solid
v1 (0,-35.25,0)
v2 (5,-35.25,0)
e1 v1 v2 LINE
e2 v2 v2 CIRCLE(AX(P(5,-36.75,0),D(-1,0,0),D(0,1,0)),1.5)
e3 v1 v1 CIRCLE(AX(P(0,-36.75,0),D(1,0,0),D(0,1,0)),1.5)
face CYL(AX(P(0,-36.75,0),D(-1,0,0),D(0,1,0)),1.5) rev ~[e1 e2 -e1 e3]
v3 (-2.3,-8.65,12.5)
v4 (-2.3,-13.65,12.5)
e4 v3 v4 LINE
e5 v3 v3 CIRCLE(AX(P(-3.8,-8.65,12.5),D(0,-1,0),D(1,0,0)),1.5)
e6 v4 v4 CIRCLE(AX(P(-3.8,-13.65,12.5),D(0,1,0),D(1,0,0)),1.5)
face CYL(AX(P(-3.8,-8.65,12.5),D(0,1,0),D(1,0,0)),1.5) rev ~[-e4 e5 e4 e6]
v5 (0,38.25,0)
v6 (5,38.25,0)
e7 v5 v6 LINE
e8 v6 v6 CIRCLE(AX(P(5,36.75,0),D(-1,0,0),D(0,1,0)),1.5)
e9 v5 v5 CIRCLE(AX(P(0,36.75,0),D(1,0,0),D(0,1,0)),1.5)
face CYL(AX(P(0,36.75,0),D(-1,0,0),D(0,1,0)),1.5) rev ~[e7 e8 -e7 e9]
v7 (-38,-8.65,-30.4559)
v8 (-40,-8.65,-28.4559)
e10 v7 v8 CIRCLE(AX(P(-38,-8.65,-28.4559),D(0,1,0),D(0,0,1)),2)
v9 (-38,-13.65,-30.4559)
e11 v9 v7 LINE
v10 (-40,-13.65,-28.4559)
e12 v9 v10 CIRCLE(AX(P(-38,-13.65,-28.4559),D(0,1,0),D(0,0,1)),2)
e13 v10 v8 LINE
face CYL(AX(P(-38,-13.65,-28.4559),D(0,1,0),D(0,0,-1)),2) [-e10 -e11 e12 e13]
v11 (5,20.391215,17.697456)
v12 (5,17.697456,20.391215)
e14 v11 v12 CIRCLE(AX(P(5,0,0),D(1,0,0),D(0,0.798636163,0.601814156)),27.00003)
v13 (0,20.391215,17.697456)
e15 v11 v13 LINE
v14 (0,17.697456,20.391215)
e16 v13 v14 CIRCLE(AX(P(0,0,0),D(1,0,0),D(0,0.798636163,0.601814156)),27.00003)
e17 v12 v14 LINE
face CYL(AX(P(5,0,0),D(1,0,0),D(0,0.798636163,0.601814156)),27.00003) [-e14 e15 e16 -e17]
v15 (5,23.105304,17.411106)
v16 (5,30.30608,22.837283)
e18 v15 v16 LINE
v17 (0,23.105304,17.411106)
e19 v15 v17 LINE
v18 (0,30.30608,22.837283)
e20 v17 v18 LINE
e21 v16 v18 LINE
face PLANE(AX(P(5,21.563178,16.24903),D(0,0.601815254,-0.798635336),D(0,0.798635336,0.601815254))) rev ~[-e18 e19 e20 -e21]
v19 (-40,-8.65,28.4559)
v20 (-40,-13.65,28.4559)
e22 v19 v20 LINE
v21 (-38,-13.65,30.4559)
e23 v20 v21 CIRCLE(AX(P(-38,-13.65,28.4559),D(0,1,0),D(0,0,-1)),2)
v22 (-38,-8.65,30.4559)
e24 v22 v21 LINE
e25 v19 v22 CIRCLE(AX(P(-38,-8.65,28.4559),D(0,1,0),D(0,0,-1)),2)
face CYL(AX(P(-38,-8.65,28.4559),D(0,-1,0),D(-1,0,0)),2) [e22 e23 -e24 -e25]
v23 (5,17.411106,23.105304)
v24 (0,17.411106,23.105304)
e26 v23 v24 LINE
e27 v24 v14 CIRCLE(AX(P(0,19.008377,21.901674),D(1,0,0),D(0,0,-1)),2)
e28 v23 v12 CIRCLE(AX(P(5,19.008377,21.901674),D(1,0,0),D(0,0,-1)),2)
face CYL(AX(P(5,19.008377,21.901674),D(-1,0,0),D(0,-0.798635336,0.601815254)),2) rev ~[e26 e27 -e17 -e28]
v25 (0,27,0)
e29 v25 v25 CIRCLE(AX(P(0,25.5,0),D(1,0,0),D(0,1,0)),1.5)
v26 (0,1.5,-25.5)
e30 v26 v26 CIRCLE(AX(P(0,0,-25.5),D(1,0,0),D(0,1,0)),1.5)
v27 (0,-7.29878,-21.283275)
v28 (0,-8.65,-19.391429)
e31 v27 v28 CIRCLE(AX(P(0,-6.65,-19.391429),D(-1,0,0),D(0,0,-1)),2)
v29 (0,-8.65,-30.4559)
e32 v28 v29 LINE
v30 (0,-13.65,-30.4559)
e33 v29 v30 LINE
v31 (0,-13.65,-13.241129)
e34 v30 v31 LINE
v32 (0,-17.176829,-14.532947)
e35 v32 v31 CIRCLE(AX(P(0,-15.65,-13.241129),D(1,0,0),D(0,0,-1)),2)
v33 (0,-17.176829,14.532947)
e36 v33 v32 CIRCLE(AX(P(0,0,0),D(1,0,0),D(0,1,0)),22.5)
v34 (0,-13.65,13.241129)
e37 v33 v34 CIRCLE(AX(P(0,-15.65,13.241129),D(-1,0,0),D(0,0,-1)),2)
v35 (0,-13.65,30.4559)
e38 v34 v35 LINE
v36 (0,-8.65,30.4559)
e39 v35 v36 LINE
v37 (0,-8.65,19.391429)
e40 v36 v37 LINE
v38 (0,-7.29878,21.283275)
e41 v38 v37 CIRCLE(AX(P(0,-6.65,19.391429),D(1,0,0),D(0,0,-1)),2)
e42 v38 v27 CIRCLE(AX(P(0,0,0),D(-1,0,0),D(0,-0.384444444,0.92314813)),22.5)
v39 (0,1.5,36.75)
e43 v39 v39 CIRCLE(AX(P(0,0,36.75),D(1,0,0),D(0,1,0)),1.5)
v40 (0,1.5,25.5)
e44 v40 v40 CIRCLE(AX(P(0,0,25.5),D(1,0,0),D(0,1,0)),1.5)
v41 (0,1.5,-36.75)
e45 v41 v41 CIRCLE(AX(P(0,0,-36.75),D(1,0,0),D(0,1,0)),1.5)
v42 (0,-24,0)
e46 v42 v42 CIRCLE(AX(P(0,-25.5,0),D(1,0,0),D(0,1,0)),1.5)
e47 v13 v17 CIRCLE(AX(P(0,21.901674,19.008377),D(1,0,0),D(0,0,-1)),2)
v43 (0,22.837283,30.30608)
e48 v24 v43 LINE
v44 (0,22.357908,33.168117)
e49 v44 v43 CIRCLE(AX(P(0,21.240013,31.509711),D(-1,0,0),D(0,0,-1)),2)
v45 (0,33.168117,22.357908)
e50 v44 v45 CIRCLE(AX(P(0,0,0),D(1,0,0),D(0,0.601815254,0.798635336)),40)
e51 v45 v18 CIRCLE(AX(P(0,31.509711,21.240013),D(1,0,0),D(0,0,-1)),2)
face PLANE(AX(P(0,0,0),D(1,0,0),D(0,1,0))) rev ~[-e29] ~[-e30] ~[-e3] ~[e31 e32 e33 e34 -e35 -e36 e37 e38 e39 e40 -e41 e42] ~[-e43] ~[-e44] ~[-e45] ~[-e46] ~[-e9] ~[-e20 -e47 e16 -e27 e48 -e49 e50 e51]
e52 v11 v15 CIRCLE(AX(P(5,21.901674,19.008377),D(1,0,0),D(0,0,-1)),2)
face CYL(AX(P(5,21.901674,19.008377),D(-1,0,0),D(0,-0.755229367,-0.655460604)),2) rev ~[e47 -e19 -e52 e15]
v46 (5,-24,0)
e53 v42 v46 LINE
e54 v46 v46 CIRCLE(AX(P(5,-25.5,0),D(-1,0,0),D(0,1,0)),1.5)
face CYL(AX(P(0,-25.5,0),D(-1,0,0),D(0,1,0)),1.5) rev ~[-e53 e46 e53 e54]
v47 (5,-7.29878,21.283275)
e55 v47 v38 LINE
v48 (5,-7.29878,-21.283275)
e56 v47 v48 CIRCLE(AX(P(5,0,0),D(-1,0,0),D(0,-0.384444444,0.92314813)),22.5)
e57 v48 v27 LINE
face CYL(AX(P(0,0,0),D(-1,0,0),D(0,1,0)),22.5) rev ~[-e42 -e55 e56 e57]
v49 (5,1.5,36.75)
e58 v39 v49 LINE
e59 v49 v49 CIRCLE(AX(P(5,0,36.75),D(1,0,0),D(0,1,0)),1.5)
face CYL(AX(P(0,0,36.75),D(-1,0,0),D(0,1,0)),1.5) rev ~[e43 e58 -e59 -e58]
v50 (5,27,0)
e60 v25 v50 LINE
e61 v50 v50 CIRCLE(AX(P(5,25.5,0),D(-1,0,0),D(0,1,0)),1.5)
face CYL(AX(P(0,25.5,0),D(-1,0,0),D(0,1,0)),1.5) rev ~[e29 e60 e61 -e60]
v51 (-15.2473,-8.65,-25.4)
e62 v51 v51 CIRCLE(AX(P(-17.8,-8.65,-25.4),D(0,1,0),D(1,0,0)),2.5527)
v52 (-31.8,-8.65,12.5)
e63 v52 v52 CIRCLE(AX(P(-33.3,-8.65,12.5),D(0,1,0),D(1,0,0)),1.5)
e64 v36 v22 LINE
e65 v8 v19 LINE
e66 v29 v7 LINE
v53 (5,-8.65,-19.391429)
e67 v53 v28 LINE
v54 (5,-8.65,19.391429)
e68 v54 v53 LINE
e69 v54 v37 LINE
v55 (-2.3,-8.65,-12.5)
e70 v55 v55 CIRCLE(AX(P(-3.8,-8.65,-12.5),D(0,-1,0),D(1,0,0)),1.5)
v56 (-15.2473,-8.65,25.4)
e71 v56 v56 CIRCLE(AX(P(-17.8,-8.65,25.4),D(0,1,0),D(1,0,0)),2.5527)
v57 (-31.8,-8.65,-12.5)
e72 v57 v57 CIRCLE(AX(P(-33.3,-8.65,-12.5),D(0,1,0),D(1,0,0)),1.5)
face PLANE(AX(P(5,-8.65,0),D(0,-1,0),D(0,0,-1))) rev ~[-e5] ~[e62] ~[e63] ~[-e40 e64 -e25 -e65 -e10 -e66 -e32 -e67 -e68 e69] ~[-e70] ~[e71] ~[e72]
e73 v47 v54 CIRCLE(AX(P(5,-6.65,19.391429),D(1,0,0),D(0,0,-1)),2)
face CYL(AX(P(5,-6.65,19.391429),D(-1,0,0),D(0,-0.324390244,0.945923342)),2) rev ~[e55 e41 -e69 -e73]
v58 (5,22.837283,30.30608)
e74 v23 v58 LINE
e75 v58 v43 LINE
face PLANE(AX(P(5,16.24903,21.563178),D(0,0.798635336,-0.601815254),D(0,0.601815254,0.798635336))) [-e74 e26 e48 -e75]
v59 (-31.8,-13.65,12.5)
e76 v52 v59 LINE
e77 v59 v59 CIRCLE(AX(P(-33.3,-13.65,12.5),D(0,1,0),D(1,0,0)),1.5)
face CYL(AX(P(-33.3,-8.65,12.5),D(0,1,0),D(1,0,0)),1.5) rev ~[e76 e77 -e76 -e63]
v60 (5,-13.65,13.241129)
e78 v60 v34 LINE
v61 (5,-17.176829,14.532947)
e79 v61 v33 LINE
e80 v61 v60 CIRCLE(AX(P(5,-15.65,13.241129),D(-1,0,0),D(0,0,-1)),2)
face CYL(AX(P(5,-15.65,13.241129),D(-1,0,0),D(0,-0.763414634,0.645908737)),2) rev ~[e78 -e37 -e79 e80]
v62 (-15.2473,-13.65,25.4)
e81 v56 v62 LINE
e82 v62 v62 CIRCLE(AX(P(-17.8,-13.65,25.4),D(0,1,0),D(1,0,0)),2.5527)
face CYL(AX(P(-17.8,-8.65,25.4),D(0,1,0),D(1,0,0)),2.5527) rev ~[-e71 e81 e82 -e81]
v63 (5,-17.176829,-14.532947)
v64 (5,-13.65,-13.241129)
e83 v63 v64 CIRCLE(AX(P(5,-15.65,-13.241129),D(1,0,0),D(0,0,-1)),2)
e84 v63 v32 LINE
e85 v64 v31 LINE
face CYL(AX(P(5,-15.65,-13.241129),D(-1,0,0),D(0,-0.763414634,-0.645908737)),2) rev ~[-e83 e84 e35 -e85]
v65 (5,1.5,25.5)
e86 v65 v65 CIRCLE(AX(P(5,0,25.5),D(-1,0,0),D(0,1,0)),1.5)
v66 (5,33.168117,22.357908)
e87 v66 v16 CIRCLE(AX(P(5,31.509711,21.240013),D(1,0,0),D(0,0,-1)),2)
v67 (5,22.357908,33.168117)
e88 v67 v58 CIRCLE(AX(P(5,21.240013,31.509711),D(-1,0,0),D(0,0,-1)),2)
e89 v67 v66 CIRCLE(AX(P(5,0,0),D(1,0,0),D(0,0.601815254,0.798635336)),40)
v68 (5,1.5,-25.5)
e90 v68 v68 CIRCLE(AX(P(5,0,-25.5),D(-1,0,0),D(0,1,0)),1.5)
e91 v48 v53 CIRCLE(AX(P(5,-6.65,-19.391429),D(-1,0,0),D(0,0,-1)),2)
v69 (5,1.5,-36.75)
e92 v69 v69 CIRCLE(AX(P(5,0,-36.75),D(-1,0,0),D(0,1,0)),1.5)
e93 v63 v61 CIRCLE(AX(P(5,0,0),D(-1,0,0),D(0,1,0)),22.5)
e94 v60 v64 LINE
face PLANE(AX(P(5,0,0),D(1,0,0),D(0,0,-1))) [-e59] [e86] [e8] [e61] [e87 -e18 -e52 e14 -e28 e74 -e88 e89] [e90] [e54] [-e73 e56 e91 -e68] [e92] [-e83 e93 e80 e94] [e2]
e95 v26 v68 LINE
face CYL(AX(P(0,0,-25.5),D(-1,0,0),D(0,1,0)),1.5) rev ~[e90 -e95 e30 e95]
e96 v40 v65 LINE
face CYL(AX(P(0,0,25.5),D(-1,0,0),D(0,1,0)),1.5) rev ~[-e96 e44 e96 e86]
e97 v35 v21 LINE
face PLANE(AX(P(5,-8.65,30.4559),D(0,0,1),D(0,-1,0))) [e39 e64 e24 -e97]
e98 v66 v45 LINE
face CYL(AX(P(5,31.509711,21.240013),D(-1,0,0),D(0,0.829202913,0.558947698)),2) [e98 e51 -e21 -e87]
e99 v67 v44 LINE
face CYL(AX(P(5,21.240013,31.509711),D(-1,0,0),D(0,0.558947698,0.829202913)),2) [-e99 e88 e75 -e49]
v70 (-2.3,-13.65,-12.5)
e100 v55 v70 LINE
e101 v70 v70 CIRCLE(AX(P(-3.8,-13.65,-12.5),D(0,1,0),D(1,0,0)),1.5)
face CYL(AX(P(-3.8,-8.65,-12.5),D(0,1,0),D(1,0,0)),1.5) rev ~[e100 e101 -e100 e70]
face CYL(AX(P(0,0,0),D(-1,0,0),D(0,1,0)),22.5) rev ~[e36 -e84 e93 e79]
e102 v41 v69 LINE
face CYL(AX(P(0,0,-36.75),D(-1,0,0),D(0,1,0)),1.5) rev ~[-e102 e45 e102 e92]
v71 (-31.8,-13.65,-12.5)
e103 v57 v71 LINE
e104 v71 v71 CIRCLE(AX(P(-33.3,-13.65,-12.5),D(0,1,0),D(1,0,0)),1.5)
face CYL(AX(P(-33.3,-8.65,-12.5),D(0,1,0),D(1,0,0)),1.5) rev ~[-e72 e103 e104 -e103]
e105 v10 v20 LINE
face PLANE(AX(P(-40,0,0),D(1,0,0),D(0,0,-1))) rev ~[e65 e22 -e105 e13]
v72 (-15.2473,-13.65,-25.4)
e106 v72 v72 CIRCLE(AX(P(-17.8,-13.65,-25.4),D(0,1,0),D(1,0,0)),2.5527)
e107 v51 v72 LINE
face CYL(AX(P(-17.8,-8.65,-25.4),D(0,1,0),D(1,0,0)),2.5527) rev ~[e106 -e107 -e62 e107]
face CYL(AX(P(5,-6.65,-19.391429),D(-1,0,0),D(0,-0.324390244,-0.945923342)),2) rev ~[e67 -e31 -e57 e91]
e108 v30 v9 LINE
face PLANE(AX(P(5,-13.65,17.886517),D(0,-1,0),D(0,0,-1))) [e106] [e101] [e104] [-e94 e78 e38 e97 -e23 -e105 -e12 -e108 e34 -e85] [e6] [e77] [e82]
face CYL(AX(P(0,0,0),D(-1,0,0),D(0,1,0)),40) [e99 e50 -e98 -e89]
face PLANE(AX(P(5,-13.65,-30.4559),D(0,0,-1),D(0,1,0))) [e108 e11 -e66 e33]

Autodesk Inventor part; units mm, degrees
ref_plane "YZ Plane" through (0, 0, 0) normal (1, 0, 0) x (0, 1, 0)
sketch "Sketch1" plane through (0, 0, 0) normal (1, 0, 0) x (0, 1, 0)
  circle A0 centre (0, 0) radius 22.5
  circle A1 centre (0, 0) radius 40
  circle A2 centre (0, 36.75) radius 1.5
  circle A3 centre (0, 25.5) radius 1.5
  line L0 (0, 22.5) -> (0, 25.5)
  circle A4 centre (-36.75, 0) radius 1.5
  circle A5 centre (-25.5, 0) radius 1.5
  circle A6 centre (0, -36.75) radius 1.5
  circle A7 centre (0, -25.5) radius 1.5
  circle A8 centre (36.75, 0) radius 1.5
  circle A9 centre (25.5, 0) radius 1.5
  dimension "d0" = 45
  dimension "d9" = 80
  dimension "d12" = 3
  dimension "d13" = 3
  dimension "d64" = 3
  dimension "d67" = 360
ref_plane "Work Plane1" through (5, 0, 0) normal (1, 0, 0) x (0, 0, -1)
sketch "Sketch2" plane through (5, 0, 0) normal (1, 0, 0) x (0, 0, -1)
  line L0 (0, 0) -> (0, -8.65)
  line L1 (0, -8.65) -> (23.4559, -8.65)
  line L2 (0, -8.65) -> (-23.4559, -8.65)
  line L3 (-23.4559, -8.65) -> (-30.4559, -8.65)
  line L4 (23.4559, -8.65) -> (30.4559, -8.65)
  line L5 (-30.4559, -8.65) -> (-30.4559, -13.65)
  line L6 (-30.4559, -13.65) -> (30.4559, -13.65)
  line L7 (30.4559, -13.65) -> (30.4559, -8.65)
  circle A0 centre (0, 0) radius 22.5
  dimension "d20" = 8.65
  dimension "d21" = 7
  dimension "d22" = 7
  dimension "d23" = 5
  dimension "d50" = 45
extrude "Extrusion2" add sketch "Sketch2" against normal blind 45 contours L1 A0 L6 L2 | L1 L4 L7 L6 A0 | A0 L6 L5 L3 L2
ref_plane "Work Plane2" through (5, -8.65, 23.4559) normal (0, 1, 0) x (1, 0, 0)
sketch "Sketch3" plane through (5, -8.65, 23.4559) normal (0, 1, 0) x (1, 0, 0)
  line L0 (-5, 23.4559) -> (-8.8, 23.4559)
  circle A0 centre (-8.8, 35.9559) radius 1.5
  circle A1 centre (-38.3, 35.9559) radius 1.5
  line L1 (-45, 53.9117) -> (-45, -7) projected
  circle A2 centre (-22.8, -1.9441) radius 2.5527
  circle A3 centre (-22.8, 48.8559) radius 2.5527
  line L2 (-8.8, 35.9559) -> (-38.3, 35.9559)
  line L3 (-8.8, 23.4559) -> (-8.8, 35.9559)
  line L4 (-8.8, 35.9559) -> (-8.8, 23.4559)
  circle A4 centre (-8.8, 10.9559) radius 1.5
  circle A5 centre (-38.3, 10.9559) radius 1.5
  line L5 (-8.8, 10.9559) -> (-38.3, 10.9559)
  line L6 (-8.8, 23.4559) -> (-8.8, 10.9559)
  dimension "d26" = 3.8
  dimension "d31" = 3
  dimension "d32" = 3
  dimension "d39" = 5.1054
  dimension "d40" = 5.1054
  dimension "d57" = 29.5
  dimension "d61" = 12.5
extrude "Extrusion3" cut sketch "Sketch3" against normal blind 50
extrude "Extrusion4" add sketch "Sketch1" along normal blind 5 contours A1 | A4 | A5 | A6 | A7 | A8 | A9
sketch "Sketch4" plane through (5, 0, 0) normal (1, 0, 0) x (0, 0, -1)
  circle A0 centre (0, 0) radius 40
  circle A1 centre (0, 0) radius 27
  line L0 (0, 0) -> (-31.9454, 24.0726)
  line L1 (-35, 0) -> (0, 0)
  line L2 (0, 0) -> (0, 35)
  line L3 (0, 0) -> (-24.0726, 31.9454)
  arc A2 (-16.249, 21.5632) -> (-21.5632, 16.249) centre (0, 0) ccw
  dimension "d51" = 54
  dimension "d53" = 37
  dimension "d54" = 37
extrude "Extrusion5" cut sketch "Sketch4" against normal blind 24.5 contours L3 A1 L0 A0 picked at (-25.4889, 24.8968)
fillet "Fillet1" radius 2 10 edges at (2.5, 31.9454, 24.0726) (2.5, 24.0726, 31.9454) (2.5, 16.249, 21.5632) (2.5, 21.5632, 16.249) (-40, -11.15, 30.4559) (-40, -11.15, -30.4559) (2.5, -8.65, -20.7708) (2.5, -8.65, 20.7708) (2.5, -13.65, 17.8865) (2.5, -13.65, -17.8865)
extrude "Extrusion6" cut sketch "Sketch1" along normal blind 24.5 contours A4 | A5 | A6 | A7 | A8 | A9
properties part number "JeVois Camera Mount"
